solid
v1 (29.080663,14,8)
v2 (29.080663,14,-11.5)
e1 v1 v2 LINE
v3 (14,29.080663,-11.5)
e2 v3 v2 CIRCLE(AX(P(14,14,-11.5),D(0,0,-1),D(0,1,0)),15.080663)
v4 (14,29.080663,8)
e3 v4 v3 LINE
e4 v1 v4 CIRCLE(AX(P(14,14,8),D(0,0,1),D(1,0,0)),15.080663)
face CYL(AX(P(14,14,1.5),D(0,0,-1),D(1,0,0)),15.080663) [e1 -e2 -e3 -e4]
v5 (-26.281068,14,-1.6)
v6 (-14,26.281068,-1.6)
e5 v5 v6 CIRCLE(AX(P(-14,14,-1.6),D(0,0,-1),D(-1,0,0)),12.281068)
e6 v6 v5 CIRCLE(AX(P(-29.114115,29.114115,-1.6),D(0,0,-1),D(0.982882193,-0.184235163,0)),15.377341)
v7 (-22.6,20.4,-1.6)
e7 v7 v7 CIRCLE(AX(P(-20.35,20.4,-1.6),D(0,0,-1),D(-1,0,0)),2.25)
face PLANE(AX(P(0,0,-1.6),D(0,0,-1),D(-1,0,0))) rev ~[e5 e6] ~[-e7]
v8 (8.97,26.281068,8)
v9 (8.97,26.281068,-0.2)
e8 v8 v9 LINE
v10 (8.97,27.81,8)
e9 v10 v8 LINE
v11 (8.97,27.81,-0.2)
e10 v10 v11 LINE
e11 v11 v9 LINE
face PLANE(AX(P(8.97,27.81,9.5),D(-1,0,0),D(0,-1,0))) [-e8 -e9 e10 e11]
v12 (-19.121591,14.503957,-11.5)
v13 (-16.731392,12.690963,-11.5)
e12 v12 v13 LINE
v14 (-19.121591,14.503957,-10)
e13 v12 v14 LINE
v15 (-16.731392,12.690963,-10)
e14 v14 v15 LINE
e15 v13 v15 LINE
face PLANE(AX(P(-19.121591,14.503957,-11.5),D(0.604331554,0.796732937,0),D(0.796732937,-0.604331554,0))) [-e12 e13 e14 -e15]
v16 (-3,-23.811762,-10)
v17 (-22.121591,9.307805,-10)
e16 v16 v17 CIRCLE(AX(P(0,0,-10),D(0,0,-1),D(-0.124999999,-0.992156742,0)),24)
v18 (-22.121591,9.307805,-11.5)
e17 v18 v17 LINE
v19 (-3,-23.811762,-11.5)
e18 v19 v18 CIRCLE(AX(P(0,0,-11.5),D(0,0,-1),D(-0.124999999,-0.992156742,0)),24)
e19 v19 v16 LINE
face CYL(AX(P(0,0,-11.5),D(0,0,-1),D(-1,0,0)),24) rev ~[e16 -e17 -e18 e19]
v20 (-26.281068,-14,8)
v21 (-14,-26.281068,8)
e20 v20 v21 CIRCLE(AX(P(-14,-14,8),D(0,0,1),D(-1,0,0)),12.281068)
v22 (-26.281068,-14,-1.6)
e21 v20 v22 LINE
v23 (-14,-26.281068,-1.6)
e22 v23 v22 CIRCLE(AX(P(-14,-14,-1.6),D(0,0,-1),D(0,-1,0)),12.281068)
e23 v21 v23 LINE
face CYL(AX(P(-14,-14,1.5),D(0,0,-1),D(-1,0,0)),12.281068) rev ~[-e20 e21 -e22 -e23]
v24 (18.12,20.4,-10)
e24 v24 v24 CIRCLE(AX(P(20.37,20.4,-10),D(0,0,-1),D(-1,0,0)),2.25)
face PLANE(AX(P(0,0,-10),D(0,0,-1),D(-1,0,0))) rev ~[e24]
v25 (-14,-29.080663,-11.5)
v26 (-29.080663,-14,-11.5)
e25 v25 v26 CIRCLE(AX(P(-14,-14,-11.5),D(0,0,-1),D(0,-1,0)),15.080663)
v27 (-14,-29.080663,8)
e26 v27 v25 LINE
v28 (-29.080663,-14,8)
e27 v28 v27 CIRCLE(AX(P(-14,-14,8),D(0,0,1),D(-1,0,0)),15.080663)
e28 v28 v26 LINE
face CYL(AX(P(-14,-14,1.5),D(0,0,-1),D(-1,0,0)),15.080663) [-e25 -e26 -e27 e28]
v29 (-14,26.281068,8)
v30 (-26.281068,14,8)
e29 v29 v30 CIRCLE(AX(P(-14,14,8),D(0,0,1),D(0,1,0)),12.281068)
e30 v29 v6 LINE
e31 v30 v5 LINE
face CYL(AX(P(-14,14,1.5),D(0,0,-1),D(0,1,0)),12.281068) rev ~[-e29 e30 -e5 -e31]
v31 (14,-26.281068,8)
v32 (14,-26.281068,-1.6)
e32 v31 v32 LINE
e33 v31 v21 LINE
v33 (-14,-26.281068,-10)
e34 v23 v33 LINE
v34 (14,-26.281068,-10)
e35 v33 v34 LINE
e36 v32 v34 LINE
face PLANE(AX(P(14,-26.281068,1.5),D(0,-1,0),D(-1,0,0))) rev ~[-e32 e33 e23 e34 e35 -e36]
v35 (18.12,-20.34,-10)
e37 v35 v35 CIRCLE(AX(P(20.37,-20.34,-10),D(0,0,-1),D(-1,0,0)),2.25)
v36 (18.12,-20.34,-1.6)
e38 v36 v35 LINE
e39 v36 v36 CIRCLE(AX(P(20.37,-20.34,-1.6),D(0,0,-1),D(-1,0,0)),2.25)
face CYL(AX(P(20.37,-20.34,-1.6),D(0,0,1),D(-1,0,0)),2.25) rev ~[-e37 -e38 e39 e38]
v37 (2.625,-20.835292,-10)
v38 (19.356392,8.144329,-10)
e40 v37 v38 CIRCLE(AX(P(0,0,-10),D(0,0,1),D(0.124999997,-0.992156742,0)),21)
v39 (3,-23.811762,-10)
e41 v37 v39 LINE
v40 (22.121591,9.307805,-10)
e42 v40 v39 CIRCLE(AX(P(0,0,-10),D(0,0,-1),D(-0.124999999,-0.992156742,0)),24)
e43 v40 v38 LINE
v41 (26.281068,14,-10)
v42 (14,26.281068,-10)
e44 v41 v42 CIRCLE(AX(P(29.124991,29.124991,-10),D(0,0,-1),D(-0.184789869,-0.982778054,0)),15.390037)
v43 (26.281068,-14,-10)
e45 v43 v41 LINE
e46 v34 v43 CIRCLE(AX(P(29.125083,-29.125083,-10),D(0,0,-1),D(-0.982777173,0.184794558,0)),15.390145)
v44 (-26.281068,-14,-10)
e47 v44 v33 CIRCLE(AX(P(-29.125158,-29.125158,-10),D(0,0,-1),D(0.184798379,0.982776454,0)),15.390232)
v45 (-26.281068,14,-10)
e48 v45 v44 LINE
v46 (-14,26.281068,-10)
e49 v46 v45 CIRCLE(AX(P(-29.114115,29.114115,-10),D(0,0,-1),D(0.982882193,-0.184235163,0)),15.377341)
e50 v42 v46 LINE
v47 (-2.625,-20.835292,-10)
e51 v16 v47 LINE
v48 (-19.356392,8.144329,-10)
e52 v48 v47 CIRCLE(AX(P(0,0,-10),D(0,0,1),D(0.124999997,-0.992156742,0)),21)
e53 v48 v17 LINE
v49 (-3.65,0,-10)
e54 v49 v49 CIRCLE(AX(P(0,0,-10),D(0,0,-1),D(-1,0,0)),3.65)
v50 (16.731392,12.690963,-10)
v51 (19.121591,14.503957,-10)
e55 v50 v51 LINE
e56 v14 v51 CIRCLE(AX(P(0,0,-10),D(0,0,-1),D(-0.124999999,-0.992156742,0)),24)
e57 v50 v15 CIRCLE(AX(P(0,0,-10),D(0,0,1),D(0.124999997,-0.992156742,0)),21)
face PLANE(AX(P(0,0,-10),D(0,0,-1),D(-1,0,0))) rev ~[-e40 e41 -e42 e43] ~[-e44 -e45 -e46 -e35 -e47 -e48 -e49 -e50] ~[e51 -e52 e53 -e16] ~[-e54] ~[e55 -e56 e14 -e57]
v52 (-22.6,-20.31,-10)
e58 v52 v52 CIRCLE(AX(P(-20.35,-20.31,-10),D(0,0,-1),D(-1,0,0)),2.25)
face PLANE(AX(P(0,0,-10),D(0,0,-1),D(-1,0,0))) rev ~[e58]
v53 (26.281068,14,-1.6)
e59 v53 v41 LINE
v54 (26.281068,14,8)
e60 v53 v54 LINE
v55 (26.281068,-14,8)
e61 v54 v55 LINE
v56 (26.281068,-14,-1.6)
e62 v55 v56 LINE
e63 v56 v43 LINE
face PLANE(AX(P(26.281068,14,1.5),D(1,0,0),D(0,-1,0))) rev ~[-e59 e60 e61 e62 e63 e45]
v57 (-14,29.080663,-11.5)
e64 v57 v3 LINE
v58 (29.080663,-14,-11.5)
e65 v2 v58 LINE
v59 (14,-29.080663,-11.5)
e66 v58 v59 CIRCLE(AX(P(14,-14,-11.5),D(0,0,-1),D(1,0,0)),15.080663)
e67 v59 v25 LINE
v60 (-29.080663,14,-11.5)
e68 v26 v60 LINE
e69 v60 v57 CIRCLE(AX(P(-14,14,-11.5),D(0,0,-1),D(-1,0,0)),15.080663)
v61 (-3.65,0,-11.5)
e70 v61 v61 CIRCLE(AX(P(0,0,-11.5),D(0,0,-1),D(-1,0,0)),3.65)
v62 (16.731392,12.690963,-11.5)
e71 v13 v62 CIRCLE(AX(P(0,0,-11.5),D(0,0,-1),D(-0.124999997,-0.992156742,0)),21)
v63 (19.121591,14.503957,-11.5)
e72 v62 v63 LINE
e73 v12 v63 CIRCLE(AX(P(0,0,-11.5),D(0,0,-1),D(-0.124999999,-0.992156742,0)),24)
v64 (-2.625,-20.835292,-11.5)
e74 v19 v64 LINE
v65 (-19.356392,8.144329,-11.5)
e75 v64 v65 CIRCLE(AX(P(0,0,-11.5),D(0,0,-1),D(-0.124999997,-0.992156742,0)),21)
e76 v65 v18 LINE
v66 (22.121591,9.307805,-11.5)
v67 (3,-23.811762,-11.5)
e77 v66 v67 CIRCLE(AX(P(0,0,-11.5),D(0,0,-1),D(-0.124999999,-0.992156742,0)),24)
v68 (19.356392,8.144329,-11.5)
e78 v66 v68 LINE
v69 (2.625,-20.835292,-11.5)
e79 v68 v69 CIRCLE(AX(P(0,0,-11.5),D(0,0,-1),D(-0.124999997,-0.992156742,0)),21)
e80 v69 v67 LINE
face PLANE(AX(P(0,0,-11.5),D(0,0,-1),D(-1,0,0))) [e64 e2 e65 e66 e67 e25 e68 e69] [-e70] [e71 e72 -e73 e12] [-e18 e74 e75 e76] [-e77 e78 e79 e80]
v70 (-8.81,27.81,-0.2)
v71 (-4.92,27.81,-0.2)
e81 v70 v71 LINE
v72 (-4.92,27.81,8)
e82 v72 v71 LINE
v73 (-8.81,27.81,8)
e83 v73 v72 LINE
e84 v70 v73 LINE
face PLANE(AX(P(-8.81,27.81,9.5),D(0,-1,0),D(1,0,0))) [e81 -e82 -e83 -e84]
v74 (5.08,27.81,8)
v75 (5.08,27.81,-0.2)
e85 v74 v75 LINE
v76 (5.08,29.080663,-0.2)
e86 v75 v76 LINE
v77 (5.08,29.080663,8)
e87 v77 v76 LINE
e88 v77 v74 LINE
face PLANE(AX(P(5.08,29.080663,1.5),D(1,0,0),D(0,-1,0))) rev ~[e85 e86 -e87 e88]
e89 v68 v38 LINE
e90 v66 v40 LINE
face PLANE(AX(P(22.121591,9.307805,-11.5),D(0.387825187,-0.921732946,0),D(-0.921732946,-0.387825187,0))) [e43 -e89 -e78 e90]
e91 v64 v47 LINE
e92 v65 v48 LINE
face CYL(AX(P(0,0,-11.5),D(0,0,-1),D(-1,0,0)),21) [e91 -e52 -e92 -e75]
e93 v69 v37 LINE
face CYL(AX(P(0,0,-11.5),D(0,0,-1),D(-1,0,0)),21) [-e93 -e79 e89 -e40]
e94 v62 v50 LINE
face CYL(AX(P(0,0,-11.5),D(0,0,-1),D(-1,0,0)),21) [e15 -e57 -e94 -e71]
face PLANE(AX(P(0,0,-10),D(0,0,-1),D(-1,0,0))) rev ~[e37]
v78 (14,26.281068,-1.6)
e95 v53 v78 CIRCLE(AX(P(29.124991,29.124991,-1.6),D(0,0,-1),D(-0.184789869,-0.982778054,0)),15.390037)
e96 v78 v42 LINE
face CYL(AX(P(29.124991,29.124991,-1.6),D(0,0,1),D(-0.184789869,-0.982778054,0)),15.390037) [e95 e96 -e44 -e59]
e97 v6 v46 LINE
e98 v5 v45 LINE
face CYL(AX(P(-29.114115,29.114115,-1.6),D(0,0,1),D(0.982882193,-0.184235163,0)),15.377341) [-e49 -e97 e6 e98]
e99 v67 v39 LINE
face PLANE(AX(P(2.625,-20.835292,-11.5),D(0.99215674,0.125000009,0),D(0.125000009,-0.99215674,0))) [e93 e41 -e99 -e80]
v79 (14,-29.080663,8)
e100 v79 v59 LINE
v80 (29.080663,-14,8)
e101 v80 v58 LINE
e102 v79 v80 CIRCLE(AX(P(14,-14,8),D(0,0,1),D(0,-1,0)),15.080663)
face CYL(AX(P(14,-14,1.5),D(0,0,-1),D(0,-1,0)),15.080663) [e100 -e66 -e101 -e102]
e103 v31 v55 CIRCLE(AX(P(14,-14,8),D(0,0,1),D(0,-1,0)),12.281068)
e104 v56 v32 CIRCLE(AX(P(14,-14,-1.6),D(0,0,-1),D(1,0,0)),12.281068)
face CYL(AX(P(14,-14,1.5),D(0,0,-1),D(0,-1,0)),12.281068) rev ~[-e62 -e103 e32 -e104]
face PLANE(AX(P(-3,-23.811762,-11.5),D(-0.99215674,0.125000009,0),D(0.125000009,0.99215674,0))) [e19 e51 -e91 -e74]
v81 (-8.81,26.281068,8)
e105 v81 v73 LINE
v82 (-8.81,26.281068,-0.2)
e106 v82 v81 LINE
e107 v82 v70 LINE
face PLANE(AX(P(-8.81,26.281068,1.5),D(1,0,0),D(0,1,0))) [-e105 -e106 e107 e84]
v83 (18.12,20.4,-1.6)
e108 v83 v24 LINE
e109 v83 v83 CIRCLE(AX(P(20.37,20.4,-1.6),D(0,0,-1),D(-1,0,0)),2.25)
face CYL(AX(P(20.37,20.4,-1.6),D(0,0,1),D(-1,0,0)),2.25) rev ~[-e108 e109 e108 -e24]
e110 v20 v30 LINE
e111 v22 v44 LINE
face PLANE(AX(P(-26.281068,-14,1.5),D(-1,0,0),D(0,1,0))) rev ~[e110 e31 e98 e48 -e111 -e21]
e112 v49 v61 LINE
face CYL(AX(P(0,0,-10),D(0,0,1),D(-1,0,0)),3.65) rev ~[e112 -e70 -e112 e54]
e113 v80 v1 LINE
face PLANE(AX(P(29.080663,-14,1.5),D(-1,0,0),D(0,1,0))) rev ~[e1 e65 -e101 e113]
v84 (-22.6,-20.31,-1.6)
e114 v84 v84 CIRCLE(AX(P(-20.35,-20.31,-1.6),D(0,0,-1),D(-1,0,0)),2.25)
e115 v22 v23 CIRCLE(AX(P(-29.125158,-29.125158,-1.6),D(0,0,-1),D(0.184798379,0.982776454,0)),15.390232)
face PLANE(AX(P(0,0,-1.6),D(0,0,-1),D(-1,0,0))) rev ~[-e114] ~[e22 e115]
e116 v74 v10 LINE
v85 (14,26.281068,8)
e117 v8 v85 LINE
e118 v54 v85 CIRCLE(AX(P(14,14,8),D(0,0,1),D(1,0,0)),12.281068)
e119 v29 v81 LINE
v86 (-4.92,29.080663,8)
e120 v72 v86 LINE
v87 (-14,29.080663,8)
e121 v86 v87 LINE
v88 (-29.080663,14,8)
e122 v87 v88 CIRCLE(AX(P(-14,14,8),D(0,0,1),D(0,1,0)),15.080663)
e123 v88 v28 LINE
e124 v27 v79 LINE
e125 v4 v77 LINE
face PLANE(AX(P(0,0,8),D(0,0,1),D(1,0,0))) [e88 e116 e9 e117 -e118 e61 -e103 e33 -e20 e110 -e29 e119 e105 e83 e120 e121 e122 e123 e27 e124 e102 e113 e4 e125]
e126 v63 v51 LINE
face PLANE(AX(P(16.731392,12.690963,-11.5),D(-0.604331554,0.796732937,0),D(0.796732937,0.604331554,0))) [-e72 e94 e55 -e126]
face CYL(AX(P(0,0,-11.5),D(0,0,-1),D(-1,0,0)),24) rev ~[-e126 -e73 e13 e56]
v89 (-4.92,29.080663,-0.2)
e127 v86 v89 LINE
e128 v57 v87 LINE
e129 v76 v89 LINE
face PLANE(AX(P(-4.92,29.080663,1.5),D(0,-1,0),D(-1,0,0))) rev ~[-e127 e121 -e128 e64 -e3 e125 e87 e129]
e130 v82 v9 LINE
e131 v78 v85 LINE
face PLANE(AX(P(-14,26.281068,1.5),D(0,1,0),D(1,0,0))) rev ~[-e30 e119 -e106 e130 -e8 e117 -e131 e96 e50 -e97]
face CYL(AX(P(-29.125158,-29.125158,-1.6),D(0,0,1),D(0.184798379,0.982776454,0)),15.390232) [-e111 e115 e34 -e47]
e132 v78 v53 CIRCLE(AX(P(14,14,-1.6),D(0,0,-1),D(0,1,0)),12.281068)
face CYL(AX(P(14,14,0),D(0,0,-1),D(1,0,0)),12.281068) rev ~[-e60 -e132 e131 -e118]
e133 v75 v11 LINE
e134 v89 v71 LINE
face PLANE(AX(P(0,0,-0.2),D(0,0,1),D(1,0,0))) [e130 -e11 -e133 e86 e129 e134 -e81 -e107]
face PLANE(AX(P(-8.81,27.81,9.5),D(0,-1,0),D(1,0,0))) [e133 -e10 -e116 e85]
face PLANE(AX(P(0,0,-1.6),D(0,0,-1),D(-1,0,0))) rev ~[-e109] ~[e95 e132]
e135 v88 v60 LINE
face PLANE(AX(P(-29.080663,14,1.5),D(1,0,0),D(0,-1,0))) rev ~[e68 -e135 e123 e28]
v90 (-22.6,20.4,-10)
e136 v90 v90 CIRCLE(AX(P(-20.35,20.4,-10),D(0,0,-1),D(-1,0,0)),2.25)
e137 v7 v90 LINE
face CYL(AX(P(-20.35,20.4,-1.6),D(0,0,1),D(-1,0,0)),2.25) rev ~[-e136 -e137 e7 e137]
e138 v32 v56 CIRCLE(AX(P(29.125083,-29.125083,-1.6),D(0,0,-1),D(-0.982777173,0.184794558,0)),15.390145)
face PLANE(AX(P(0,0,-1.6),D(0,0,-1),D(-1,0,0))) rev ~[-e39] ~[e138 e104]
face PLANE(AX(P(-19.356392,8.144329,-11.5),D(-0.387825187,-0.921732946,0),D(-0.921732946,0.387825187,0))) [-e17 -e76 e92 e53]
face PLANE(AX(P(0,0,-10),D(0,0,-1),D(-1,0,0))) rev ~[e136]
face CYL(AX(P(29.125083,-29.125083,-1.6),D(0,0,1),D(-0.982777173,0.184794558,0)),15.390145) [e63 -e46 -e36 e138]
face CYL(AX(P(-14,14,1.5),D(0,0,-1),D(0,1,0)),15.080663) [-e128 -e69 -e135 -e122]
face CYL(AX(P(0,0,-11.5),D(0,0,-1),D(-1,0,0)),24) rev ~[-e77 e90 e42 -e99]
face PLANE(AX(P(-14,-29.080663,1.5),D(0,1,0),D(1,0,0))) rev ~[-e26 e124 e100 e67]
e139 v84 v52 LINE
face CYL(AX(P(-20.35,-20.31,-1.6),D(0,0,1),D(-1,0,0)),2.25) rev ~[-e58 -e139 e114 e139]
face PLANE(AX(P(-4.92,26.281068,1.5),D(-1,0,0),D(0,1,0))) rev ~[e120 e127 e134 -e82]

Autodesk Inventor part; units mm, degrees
ref_plane "YZ Plane" through (0, 0, 0) normal (1, 0, 0) x (0, 1, 0)
ref_plane "XZ Plane" through (0, 0, 0) normal (0, 1, 0) x (-1, 0, 0)
ref_plane "XY Plane" through (0, 0, 0) normal (0, 0, 1) x (1, 0, 0)
sketch "Skizze1" plane through (0, 0, 0) normal (0, 0, 1) x (1, 0, 0)
  line L0 (-26, -14) -> (-26, 14)
  arc A0 (-14, 26) -> (-26, 14) centre (-14, 14) ccw
  line L1 (-14, 26) -> (14, 26)
  arc A1 (26, 14) -> (14, 26) centre (14, 14) ccw
  line L2 (26, 14) -> (26, -14)
  arc A2 (14, -26) -> (26, -14) centre (14, -14) ccw
  line L3 (14, -26) -> (-14, -26)
  arc A3 (-26, -14) -> (-14, -26) centre (-14, -14) ccw
  circle A4 centre (-7.42, 8.73) radius 0.55
  circle A5 centre (-7.42, 11.27) radius 0.55
  circle A6 centre (-3, 10.4) radius 0.4
  circle A7 centre (7.82, 11.27) radius 0.55
  circle A8 centre (7.82, 8.73) radius 0.55
  circle A9 centre (-2.5, 7) radius 0.5
  circle A10 centre (-7.42, 6.19) radius 0.55
  circle A11 centre (7.82, 6.19) radius 0.55
  circle A12 centre (2.5, 7) radius 0.5
  circle A13 centre (-7.42, 3.65) radius 0.55
  circle A14 centre (7.82, 3.65) radius 0.55
  circle A15 centre (0, -7.5) radius 0.5
  circle A16 centre (-2.5, -7.5) radius 0.5
  circle A17 centre (-7.42, -3.97) radius 0.55
  circle A18 centre (2.5, -7.5) radius 0.5
  circle A19 centre (-7.42, 1.11) radius 0.55
  circle A20 centre (-7.42, -1.43) radius 0.55
  circle A21 centre (7.82, -1.43) radius 0.55
  circle A22 centre (7.82, -3.97) radius 0.55
  circle A23 centre (7.82, 1.11) radius 0.55
  circle A24 centre (7.82, 23.97) radius 0.55
  circle A25 centre (7.82, 21.43) radius 0.55
  circle A26 centre (-7.42, 21.43) radius 0.55
  circle A27 centre (-3, 20.56) radius 0.4
  circle A28 centre (-7.42, 23.97) radius 0.55
  circle A29 centre (-7.42, 16.35) radius 0.55
  circle A30 centre (-7.42, 18.89) radius 0.55
  circle A31 centre (7.82, 18.89) radius 0.55
  circle A32 centre (7.82, 16.35) radius 0.55
  circle A33 centre (7.82, 13.81) radius 0.55
  circle A34 centre (-7.42, 13.81) radius 0.55
  circle A35 centre (20.37, 20.4) radius 1.6
  circle A36 centre (20.37, -20.34) radius 1.6
  circle A37 centre (-20.35, -20.31) radius 1.6
  circle A38 centre (-20.35, 20.4) radius 1.6
  line L4 (14, 29.080663) -> (-14, 29.080663)
  arc A39 (-14, 29.080663) -> (-29.080663, 14) centre (-14, 14) ccw
  line L5 (-29.080663, 14) -> (-29.080663, -14)
  arc A40 (-29.080663, -14) -> (-14, -29.080663) centre (-14, -14) ccw
  line L6 (-14, -29.080663) -> (14, -29.080663)
  arc A41 (14, -29.080663) -> (29.080663, -14) centre (14, -14) ccw
  line L7 (29.080663, -14) -> (29.080663, 14)
  arc A42 (29.080663, 14) -> (14, 29.080663) centre (14, 14) ccw
  line L8 (-14, -26.281068) -> (14, -26.281068)
  arc A43 (14, -26.281068) -> (26.281068, -14) centre (14, -14) ccw
  line L9 (26.281068, -14) -> (26.281068, 14)
  arc A44 (26.281068, 14) -> (14, 26.281068) centre (14, 14) ccw
  line L10 (14, 26.281068) -> (-14, 26.281068)
  arc A45 (-14, 26.281068) -> (-26.281068, 14) centre (-14, 14) ccw
  line L11 (-26.281068, 14) -> (-26.281068, -14)
  arc A46 (-26.281068, -14) -> (-14, -26.281068) centre (-14, -14) ccw
  point P0 (0, 0)
extrude "Extrusion1" add sketch "Skizze1" against normal blind 10 contours A42 L7 A41 L6 A40 L5 A39 L4
ref_plane "Arbeitsebene1" through (0, 0, -1.6) normal (0, 0, -1) x (-1, 0, 0)
sketch "Skizze3 outline for Extrusion2" plane through (0, 0, -1.6) normal (0, 0, -1) x (-1, 0, 0)
  arc A0 (26.281068, -14) -> (14, -26.281068) centre (29.125158, -29.125158) ccw
  arc A1 (14, -26.281068) -> (26.281068, -14) centre (14, -14) ccw
  circle A2 centre (20.35, -20.31) radius 2.25
  arc A3 (-26.281068, -14) -> (-14, -26.281068) centre (-14, -14) ccw
  arc A4 (-14, -26.281068) -> (-26.281068, -14) centre (-29.125083, -29.125083) ccw
  circle A5 centre (-20.37, -20.34) radius 2.25
  arc A6 (-26.281068, 14) -> (-14, 26.281068) centre (-29.124991, 29.124991) ccw
  arc A7 (-14, 26.281068) -> (-26.281068, 14) centre (-14, 14) ccw
  circle A8 centre (-20.37, 20.4) radius 2.25
  arc A9 (14, 26.281068) -> (26.281068, 14) centre (29.114115, 29.114115) ccw
  arc A10 (26.281068, 14) -> (14, 26.281068) centre (14, 14) ccw
  circle A11 centre (20.35, 20.4) radius 2.25
extrude "Extrusion2" add sketch "Skizze3 outline for Extrusion2" along normal up to surface (8.4 mm away)
sketch "Skizze2" plane through (0, 0, -10) normal (0, 0, -1) x (-1, 0, 0)
  line L0 (14, 29.080663) -> (-14, 29.080663)
  arc A0 (-14, 29.080663) -> (-29.080663, 14) centre (-14, 14) ccw
  line L1 (-29.080663, 14) -> (-29.080663, -14)
  arc A1 (-29.080663, -14) -> (-14, -29.080663) centre (-14, -14) ccw
  line L2 (-14, -29.080663) -> (14, -29.080663)
  arc A2 (14, -29.080663) -> (29.080663, -14) centre (14, -14) ccw
  line L3 (29.080663, -14) -> (29.080663, 14)
  arc A3 (29.080663, 14) -> (14, 29.080663) centre (14, 14) ccw
  circle A4 centre (0, 0) radius 3.5
  circle A5 centre (0, 0) radius 3.5
  circle A6 centre (0, 0) radius 3.65
  point P0 (0, 0)
  dimension "d12" = 0.15
extrude "Extrusion3" add sketch "Skizze2" along normal blind 1.5 contours A3 L3 A2 L2 A1 L1 A0 L0
sketch "Skizze4" plane through (0, 0, 0) normal (0, 0, 1) x (1, 0, 0)
  line L0 (14, 29.080663) -> (-14, 29.080663)
  arc A0 (-14, 29.080663) -> (-29.080663, 14) centre (-14, 14) ccw
  line L1 (-29.080663, 14) -> (-29.080663, -14)
  arc A1 (-29.080663, -14) -> (-14, -29.080663) centre (-14, -14) ccw
  line L2 (-14, -29.080663) -> (14, -29.080663)
  arc A2 (14, -29.080663) -> (29.080663, -14) centre (14, -14) ccw
  line L3 (29.080663, -14) -> (29.080663, 14)
  arc A3 (29.080663, 14) -> (14, 29.080663) centre (14, 14) ccw
  arc A4 (14, -26.281068) -> (26.281068, -14) centre (14, -14) ccw
  line L4 (14, -26.281068) -> (-14, -26.281068)
  arc A5 (-26.281068, -14) -> (-14, -26.281068) centre (-14, -14) ccw
  line L5 (-26.281068, -14) -> (-26.281068, 14)
  arc A6 (-14, 26.281068) -> (-26.281068, 14) centre (-14, 14) ccw
  line L6 (-14, 26.281068) -> (14, 26.281068)
  arc A7 (26.281068, 14) -> (14, 26.281068) centre (14, 14) ccw
  line L7 (26.281068, 14) -> (26.281068, -14)
  line L8 (14, 29.080663) -> (-14, 29.080663)
  arc A8 (-14, 29.080663) -> (-29.080663, 14) centre (-14, 14) ccw
  line L9 (-29.080663, 14) -> (-29.080663, -14)
  arc A9 (-29.080663, -14) -> (-14, -29.080663) centre (-14, -14) ccw
  line L10 (-14, -29.080663) -> (14, -29.080663)
  arc A10 (14, -29.080663) -> (29.080663, -14) centre (14, -14) ccw
  line L11 (29.080663, -14) -> (29.080663, 14)
  arc A11 (29.080663, 14) -> (14, 29.080663) centre (14, 14) ccw
  point P0 (0, 0)
extrude "Extrusion4" add sketch "Skizze4" along normal blind 1.5
sketch "Skizze5" plane through (0, 0, 1.5) normal (0, 0, 1) x (1, 0, 0)
  line L0 (-3.62, 24.2) -> (-3.62, 28.75)
  line L1 (3.78, 24.2) -> (3.78, 28.75)
  line L2 (-3.62, 28.75) -> (-3.62, 29.080663)
  line L3 (14, 29.080663) -> (-14, 29.080663)
  line L4 (3.78, 28.75) -> (3.78, 29.080663)
  line L5 (3.78, 29.080663) -> (-3.62, 29.080663)
  line L6 (-14, 26) -> (14, 26)
  line L7 (-3.62, 26) -> (3.78, 26)
  line L8 (14, 29.080663) -> (-14, 29.080663)
  arc A0 (-14, 29.080663) -> (-29.080663, 14) centre (-14, 14) ccw
  line L9 (-29.080663, 14) -> (-29.080663, -14)
  arc A1 (-29.080663, -14) -> (-14, -29.080663) centre (-14, -14) ccw
  line L10 (-14, -29.080663) -> (14, -29.080663)
  arc A2 (14, -29.080663) -> (29.080663, -14) centre (14, -14) ccw
  line L11 (29.080663, -14) -> (29.080663, 14)
  arc A3 (29.080663, 14) -> (14, 29.080663) centre (14, 14) ccw
  line L12 (-4.92, 29.080663) -> (5.08, 29.080663)
  line L13 (5.08, 29.080663) -> (5.08, 26)
  line L14 (5.08, 26) -> (-4.92, 26)
  line L15 (-4.92, 26) -> (-4.92, 29.080663)
  line L16 (14, -26.281068) -> (-14, -26.281068)
  arc A4 (-26.281068, -14) -> (-14, -26.281068) centre (-14, -14) ccw
  line L17 (-26.281068, -14) -> (-26.281068, 14)
  arc A5 (-14, 26.281068) -> (-26.281068, 14) centre (-14, 14) ccw
  line L18 (-14, 26.281068) -> (14, 26.281068)
  arc A6 (26.281068, 14) -> (14, 26.281068) centre (14, 14) ccw
  line L19 (26.281068, 14) -> (26.281068, -14)
  arc A7 (14, -26.281068) -> (26.281068, -14) centre (14, -14) ccw
  line L20 (14, 29.080663) -> (-14, 29.080663)
  arc A8 (-14, 29.080663) -> (-29.080663, 14) centre (-14, 14) ccw
  line L21 (-29.080663, 14) -> (-29.080663, -14)
  arc A9 (-29.080663, -14) -> (-14, -29.080663) centre (-14, -14) ccw
  line L22 (-14, -29.080663) -> (14, -29.080663)
  arc A10 (14, -29.080663) -> (29.080663, -14) centre (14, -14) ccw
  line L23 (29.080663, -14) -> (29.080663, 14)
  arc A11 (29.080663, 14) -> (14, 29.080663) centre (14, 14) ccw
  point P0 (0, 0)
  point P1 (-4.12, 26)
  point P2 (-4.12, 29.080663)
  point P3 (4.28, 26)
  point P4 (4.28, 29.080663)
  dimension "d36" = 10
extrude "Extrusion5" add sketch "Skizze5" along normal blind 8 contours L18 A5 L17 A4 L16 A7 L19 A6 L13 L3 A3 L11 A2 L10 A1 L9 A0 L15
sketch "Skizze6" plane through (0, 0, 9.5) normal (0, 0, 1) x (1, 0, 0)
  line L0 (8.97, 27.81) -> (8.97, -5.21)
  line L1 (-8.81, 27.81) -> (8.97, 27.81)
  line L2 (-8.81, -5.21) -> (-8.81, 27.81)
  line L3 (8.97, -5.21) -> (-8.81, -5.21)
  circle A0 centre (-7.55, -3.94) radius 0.530308
  circle A1 centre (-7.55, -1.4) radius 0.530308
  circle A2 centre (-7.55, 1.14) radius 0.530308
  circle A3 centre (-7.55, 3.68) radius 0.530308
  circle A4 centre (-7.55, 6.22) radius 0.530308
  circle A5 centre (-7.55, 8.76) radius 0.530308
  circle A6 centre (-7.55, 11.3) radius 0.530308
  circle A7 centre (-7.55, 13.84) radius 0.530308
  circle A8 centre (-7.55, 16.38) radius 0.530308
  circle A9 centre (-7.55, 18.92) radius 0.530308
  circle A10 centre (-7.55, 21.46) radius 0.530308
  circle A11 centre (-7.55, 24) radius 0.530308
  circle A12 centre (7.7, -3.94) radius 0.530308
  circle A13 centre (7.7, -1.4) radius 0.530308
  circle A14 centre (7.7, 1.14) radius 0.530308
  circle A15 centre (7.7, 3.68) radius 0.530308
  circle A16 centre (7.7, 6.22) radius 0.530308
  circle A17 centre (7.7, 8.76) radius 0.530308
  circle A18 centre (7.7, 11.3) radius 0.530308
  circle A19 centre (7.7, 13.84) radius 0.530308
  circle A20 centre (7.7, 16.38) radius 0.530308
  circle A21 centre (7.7, 18.92) radius 0.530308
  circle A22 centre (7.7, 21.46) radius 0.530308
  circle A23 centre (7.7, 24) radius 0.530308
  point P0 (0, 0)
extrude "Extrusion6" cut sketch "Skizze6" against normal up to surface (8 mm away)
sketch "Skizze7" plane through (0, 0, -11.5) normal (0, 0, -1) x (-1, 0, 0)
  circle A0 centre (0, 0) radius 22.5
  circle A1 centre (0, 0) radius 24
  circle A2 centre (0, 0) radius 21
  dimension "d23" = 45
  dimension "d24" = 1.5
  dimension "d25" = 1.5
extrude "Extrusion7" cut sketch "Skizze7" against normal blind 5.75 contours A0 | A1
sketch "Skizze8" plane through (0, 0, -11.5) normal (0, 0, -1) x (-1, 0, 0)
  circle A0 centre (8, -21) radius 1.666667
  circle A1 centre (-8, -21) radius 1.666667
  circle A2 centre (-20, -10.4) radius 1.666667
  circle A3 centre (-21.8, 5.5) radius 1.666667
  circle A4 centre (19.9, -10.4) radius 1.666667
  circle A5 centre (21.8, 5.5) radius 1.666667
  circle A6 centre (12.7, 18.6) radius 1.666667
  circle A7 centre (-12.7, 18.6) radius 1.666667
  line L0 (14, 29.080663) -> (-14, 29.080663)
  arc A8 (-14, 29.080663) -> (-29.080663, 14) centre (-14, 14) ccw
  line L1 (-29.080663, 14) -> (-29.080663, -14)
  arc A9 (-29.080663, -14) -> (-14, -29.080663) centre (-14, -14) ccw
  line L2 (-14, -29.080663) -> (14, -29.080663)
  arc A10 (14, -29.080663) -> (29.080663, -14) centre (14, -14) ccw
  line L3 (29.080663, -14) -> (29.080663, 14)
  arc A11 (29.080663, 14) -> (14, 29.080663) centre (14, 14) ccw
  circle A12 centre (0, 0) radius 24
  circle A13 centre (0, 0) radius 21
  line L4 (3, -23.811762) -> (2.625, -20.835292)
  circle A14 centre (0, 0) radius 21
  line L5 (0, -24) -> (0, -21)
  line L6 (-2.625, -20.835292) -> (-3, -23.811762)
  circle A15 centre (0, 0) radius 24
  dimension "d29" = 3
  dimension "d30" = 3
extrude "Extrusion8" add sketch "Skizze8" against normal up to surface (1.5 mm away) contours L4 A12 L5 A13 | L5 A12 L6 A13
pattern_circular "Runde Anordnung1" count 3 over 360 about axis through (0, 0, -11.5) along (0, 0, 1) of "Extrusion8"
sketch "Skizze9" plane through (0, 0, 1.5) normal (0, 0, 1) x (1, 0, 0)
  line L0 (5.08, 27.81) -> (5.08, 29.080663)
  line L1 (5.08, 29.080663) -> (-4.92, 29.080663)
  line L2 (-4.92, 29.080663) -> (-4.92, 27.81)
  line L3 (-8.81, 27.81) -> (-4.92, 27.81)
  line L4 (-8.81, 26.281068) -> (-8.81, 27.81)
  line L5 (-8.81, 26.281068) -> (8.97, 26.281068)
  line L6 (8.97, 27.81) -> (8.97, 26.281068)
  line L7 (5.08, 27.81) -> (8.97, 27.81)
  point P0 (0, 0)
extrude "Extrusion9" cut sketch "Skizze9" against normal blind 1.7
sketch "Skizze10" plane through (0, 0, 9.5) normal (0, 0, 1) x (1, 0, 0)
  line L0 (8.97, 27.81) -> (8.97, 26.281068)
  line L1 (8.97, 26.281068) -> (14, 26.281068)
  arc A0 (26.281068, 14) -> (14, 26.281068) centre (14, 14) ccw
  line L2 (26.281068, 14) -> (26.281068, -14)
  arc A1 (14, -26.281068) -> (26.281068, -14) centre (14, -14) ccw
  line L3 (14, -26.281068) -> (-14, -26.281068)
  arc A2 (-26.281068, -14) -> (-14, -26.281068) centre (-14, -14) ccw
  line L4 (-26.281068, -14) -> (-26.281068, 14)
  arc A3 (-14, 26.281068) -> (-26.281068, 14) centre (-14, 14) ccw
  line L5 (-14, 26.281068) -> (-8.81, 26.281068)
  line L6 (-8.81, 26.281068) -> (-8.81, 27.81)
  line L7 (-8.81, 27.81) -> (-4.92, 27.81)
  line L8 (-4.92, 27.81) -> (-4.92, 29.080663)
  line L9 (-4.92, 29.080663) -> (-14, 29.080663)
  arc A4 (-14, 29.080663) -> (-29.080663, 14) centre (-14, 14) ccw
  line L10 (-29.080663, 14) -> (-29.080663, -14)
  arc A5 (-29.080663, -14) -> (-14, -29.080663) centre (-14, -14) ccw
  line L11 (-14, -29.080663) -> (14, -29.080663)
  arc A6 (14, -29.080663) -> (29.080663, -14) centre (14, -14) ccw
  line L12 (29.080663, -14) -> (29.080663, 14)
  arc A7 (29.080663, 14) -> (14, 29.080663) centre (14, 14) ccw
  line L13 (14, 29.080663) -> (5.08, 29.080663)
  line L14 (5.08, 29.080663) -> (5.08, 27.81)
  line L15 (5.08, 27.81) -> (8.97, 27.81)
  point P0 (0, 0)
extrude "Extrusion10" cut sketch "Skizze10" against normal blind 1.5
properties part number "Oberbau"
